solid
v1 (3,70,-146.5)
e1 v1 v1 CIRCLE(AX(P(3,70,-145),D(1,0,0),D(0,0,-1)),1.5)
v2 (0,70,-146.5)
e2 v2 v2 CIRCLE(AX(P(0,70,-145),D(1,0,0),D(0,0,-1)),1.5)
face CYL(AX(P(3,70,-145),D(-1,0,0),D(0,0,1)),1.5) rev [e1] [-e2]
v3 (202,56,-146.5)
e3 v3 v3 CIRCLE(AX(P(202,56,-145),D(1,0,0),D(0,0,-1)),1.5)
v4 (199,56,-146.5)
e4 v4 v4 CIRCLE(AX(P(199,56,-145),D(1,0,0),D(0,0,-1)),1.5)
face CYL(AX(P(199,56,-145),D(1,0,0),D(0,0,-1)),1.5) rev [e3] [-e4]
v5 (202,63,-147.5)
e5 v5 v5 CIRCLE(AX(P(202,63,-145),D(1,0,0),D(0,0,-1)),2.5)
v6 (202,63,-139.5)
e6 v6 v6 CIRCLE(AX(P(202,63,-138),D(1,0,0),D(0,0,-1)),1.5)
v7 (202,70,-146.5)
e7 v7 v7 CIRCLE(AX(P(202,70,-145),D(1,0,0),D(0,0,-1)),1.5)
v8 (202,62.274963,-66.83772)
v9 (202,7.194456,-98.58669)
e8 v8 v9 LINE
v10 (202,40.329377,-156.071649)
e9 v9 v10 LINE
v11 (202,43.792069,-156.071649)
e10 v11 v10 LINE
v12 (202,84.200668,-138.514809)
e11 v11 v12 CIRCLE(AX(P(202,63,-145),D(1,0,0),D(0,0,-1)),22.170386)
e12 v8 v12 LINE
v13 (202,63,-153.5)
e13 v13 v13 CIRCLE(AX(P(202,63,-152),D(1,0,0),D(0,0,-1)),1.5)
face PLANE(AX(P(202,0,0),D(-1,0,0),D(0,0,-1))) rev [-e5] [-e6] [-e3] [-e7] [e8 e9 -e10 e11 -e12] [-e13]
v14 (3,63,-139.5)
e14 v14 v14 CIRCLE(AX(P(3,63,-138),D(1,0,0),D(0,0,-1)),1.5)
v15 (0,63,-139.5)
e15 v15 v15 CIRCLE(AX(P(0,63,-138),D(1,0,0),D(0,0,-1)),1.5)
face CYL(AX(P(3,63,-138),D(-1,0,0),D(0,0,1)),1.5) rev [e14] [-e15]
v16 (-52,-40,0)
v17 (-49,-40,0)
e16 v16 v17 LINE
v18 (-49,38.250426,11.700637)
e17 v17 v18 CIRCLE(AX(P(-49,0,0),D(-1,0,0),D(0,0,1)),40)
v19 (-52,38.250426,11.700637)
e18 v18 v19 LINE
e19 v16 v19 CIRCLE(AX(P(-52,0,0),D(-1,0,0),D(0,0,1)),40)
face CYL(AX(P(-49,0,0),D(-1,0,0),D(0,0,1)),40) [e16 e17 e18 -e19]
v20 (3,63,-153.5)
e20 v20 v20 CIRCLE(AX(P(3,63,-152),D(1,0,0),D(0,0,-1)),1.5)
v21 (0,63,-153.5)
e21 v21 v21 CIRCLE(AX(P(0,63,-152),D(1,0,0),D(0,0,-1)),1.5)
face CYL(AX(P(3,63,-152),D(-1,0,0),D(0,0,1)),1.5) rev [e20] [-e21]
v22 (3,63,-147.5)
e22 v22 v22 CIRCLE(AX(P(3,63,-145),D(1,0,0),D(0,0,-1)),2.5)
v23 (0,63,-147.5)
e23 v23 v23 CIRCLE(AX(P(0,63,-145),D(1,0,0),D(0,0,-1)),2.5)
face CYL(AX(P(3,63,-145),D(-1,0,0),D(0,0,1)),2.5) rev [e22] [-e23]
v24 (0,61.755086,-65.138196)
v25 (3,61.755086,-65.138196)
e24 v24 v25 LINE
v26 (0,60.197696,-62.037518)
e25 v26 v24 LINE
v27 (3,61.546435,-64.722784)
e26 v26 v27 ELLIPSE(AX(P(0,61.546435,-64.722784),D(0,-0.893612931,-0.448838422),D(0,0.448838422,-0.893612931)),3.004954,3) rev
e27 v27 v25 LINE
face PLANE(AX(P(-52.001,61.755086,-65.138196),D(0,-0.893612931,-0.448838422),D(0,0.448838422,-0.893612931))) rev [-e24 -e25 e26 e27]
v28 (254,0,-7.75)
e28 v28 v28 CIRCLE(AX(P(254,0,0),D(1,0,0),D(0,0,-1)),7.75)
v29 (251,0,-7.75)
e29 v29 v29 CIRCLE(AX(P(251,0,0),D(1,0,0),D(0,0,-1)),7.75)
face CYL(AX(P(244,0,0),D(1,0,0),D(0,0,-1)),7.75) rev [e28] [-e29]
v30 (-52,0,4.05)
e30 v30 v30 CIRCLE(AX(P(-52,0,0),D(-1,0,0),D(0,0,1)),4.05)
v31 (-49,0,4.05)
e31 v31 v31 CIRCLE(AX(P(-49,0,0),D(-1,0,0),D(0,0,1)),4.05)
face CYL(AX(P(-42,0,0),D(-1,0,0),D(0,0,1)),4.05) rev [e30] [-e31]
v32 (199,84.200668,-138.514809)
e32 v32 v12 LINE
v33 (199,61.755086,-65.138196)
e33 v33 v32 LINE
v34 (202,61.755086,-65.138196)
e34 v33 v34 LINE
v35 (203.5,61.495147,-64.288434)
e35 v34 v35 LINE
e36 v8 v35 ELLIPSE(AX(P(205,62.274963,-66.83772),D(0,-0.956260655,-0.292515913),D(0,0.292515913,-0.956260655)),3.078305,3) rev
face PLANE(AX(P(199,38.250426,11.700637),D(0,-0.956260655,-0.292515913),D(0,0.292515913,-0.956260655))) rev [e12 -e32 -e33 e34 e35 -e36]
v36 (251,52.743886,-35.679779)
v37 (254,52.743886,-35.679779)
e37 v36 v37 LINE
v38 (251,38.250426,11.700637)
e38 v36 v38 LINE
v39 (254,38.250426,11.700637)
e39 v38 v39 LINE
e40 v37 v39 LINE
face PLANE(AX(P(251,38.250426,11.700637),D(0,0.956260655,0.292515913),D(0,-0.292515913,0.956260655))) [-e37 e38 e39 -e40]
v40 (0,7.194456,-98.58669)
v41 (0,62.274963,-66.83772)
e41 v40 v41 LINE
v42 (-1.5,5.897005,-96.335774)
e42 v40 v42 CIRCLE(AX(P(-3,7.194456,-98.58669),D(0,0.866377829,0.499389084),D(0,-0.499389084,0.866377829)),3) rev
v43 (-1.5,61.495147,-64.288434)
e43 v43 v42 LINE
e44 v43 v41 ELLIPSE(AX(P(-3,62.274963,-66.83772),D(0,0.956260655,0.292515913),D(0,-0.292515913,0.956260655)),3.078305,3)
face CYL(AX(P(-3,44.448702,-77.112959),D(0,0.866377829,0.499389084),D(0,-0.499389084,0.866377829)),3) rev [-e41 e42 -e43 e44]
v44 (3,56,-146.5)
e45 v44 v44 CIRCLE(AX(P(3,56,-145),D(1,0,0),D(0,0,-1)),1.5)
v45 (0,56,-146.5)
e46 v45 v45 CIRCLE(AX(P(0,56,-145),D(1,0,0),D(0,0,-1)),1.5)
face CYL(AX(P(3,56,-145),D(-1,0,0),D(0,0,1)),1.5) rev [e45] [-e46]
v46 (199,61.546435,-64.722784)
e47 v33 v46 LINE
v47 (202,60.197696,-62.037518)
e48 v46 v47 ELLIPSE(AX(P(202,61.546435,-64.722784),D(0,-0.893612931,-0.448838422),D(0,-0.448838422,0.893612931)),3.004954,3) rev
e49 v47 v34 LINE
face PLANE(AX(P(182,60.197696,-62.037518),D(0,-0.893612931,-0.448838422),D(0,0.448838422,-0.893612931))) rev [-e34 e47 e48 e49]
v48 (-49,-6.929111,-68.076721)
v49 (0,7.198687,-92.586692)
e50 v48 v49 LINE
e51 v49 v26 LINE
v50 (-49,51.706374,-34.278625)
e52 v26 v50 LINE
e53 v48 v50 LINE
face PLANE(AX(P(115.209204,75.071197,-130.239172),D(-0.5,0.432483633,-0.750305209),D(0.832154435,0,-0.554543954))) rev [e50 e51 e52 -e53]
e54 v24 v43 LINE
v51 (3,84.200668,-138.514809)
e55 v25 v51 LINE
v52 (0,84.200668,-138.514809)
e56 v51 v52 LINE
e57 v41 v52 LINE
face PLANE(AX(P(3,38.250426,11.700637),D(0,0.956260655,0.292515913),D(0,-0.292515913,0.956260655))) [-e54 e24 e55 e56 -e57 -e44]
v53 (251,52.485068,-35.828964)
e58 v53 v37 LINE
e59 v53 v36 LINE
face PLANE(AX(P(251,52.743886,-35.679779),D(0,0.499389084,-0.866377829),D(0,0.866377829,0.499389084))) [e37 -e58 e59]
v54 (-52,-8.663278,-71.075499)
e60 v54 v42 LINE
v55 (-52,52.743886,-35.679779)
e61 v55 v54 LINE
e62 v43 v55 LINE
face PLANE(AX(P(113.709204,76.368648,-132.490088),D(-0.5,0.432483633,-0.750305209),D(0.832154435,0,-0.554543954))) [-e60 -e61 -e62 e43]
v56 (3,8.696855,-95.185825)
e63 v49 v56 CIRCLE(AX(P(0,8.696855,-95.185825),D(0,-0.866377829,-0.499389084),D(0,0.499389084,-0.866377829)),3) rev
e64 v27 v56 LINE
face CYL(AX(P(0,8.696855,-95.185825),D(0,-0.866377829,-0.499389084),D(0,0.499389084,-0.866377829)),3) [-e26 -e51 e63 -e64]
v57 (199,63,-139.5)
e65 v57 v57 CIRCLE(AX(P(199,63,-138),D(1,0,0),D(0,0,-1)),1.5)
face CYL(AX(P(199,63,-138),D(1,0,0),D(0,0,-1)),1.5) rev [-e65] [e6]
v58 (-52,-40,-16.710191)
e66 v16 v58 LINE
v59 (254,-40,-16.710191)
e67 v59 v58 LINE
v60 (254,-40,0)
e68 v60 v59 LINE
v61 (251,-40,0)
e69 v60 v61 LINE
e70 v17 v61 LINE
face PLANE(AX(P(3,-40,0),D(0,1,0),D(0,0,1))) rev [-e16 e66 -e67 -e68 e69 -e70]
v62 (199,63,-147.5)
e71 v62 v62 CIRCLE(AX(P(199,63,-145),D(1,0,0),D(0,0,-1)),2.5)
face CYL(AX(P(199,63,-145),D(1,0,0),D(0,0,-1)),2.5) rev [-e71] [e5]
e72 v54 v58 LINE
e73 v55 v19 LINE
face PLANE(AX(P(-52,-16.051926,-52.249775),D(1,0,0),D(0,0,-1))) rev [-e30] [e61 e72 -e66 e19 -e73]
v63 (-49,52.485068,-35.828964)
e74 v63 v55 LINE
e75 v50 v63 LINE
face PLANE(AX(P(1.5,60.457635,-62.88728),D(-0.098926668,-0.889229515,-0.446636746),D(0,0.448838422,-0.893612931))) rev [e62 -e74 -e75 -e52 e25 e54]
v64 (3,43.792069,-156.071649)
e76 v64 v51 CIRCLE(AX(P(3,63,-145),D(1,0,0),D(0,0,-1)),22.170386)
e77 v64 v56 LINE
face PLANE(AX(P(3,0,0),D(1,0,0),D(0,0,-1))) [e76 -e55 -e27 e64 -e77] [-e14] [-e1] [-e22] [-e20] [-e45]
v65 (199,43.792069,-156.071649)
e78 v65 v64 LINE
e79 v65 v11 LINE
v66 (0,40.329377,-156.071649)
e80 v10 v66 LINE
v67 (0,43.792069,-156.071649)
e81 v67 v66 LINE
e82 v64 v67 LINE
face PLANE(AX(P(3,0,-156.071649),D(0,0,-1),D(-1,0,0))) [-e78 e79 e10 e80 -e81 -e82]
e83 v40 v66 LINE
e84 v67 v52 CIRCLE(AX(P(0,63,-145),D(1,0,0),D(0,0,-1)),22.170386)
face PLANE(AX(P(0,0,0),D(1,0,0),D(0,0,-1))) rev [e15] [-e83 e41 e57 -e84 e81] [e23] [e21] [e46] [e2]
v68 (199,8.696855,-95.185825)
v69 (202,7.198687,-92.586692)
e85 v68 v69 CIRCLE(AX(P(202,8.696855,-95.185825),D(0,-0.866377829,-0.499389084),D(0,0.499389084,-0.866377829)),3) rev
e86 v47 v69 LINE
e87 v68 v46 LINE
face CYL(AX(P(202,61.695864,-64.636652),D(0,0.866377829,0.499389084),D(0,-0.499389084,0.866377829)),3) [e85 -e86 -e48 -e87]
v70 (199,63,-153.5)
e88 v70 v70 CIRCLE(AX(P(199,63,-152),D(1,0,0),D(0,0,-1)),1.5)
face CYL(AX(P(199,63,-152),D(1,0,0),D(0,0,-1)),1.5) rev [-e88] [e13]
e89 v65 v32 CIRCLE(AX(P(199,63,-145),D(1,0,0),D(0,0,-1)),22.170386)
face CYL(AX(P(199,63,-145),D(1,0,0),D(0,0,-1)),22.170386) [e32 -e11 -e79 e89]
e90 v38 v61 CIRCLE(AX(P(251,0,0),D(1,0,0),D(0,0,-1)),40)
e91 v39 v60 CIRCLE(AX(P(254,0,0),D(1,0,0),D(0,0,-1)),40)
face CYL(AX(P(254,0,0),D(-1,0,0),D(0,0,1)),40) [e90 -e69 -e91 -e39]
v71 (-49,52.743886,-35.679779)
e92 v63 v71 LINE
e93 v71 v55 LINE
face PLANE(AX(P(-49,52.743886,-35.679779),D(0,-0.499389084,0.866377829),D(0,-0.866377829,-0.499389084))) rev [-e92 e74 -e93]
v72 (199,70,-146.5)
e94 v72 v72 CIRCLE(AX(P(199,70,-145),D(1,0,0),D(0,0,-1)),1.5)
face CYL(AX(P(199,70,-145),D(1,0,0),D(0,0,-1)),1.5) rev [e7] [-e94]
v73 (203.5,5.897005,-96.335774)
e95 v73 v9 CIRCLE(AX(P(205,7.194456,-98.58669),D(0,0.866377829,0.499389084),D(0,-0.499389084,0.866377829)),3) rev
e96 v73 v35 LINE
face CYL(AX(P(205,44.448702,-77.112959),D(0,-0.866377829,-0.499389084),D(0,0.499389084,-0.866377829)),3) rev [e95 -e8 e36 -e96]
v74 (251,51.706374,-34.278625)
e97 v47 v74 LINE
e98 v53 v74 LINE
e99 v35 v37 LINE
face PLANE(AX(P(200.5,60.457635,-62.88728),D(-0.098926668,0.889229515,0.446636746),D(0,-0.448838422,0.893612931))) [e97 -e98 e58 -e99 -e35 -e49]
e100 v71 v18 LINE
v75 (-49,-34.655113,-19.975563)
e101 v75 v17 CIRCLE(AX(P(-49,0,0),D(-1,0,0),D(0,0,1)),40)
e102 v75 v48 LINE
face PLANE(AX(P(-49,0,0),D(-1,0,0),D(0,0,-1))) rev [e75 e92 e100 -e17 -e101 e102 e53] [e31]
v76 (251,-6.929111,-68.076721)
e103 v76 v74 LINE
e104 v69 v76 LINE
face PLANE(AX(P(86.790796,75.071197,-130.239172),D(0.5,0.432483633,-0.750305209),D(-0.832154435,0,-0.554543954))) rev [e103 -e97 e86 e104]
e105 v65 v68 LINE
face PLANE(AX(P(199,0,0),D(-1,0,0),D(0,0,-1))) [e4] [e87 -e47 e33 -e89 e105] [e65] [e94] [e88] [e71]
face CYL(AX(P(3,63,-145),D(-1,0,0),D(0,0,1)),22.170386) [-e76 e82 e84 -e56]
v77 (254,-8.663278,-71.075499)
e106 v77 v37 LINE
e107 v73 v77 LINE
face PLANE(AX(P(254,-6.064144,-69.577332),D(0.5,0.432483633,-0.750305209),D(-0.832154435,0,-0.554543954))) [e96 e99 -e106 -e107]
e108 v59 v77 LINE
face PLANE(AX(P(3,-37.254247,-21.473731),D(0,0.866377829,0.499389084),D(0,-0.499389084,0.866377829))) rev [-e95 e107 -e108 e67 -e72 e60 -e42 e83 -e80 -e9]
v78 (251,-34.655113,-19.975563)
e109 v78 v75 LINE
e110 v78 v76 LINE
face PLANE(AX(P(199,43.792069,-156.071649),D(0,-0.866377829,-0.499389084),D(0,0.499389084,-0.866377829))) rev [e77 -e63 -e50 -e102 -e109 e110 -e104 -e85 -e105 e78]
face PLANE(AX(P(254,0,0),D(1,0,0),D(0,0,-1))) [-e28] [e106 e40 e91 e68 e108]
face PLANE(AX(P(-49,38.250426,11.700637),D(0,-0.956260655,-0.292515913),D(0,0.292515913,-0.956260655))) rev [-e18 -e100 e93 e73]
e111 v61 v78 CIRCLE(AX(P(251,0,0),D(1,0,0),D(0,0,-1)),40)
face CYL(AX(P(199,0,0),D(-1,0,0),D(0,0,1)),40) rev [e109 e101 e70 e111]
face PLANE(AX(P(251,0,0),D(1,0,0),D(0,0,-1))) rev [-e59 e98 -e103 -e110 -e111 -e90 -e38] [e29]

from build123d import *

# Parameters (mm, degrees)
SKETCH_2_R          = 3
SKETCH_2_R_2        = 1.5
SKETCH_2_R_3        = 2.5
EXTRUDE_1_DEPTH     = 3
EXTRUDE_2_DEPTH     = 196
SKETCH_5_R          = 8
CUT_EXTRUDE_1_DEPTH = 10
SKETCH_6_R          = 4.05
CUT_EXTRUDE_2_DEPTH = 10
SKETCH_8_R          = 40
EXTRUDE_3_DEPTH     = 3
EXTRUDE_START       = -61
EXTRUDE_4_DEPTH     = 64
EXTRUDE_5_DEPTH     = 3
EXTRUDE_START_2     = -3
EXTRUDE_14_DEPTH    = 3
EXTRUDE_15_DEPTH    = 3
SKETCH_16_R         = 40
EXTRUDE_16_DEPTH    = 3
CUT_EXTRUDE_START   = -20
CUT_EXTRUDE_5_DEPTH = 20
CUT_EXTRUDE_6_DEPTH = 20
CUT_EXTRUDE_7_DEPTH = 3
FILLET_3_R          = 3
FILLET_4_R          = 3
FILLET_5_R          = 3
FILLET_6_R          = 3
SKETCH_22_R         = 7.75
CUT_EXTRUDE_8_DEPTH = 10
SKETCH_23_R         = 4.05
CUT_EXTRUDE_9_DEPTH = 10


# Some blends are built 0.0001 mm under size
with BuildPart() as part:
    # 草图2 → 凸台-拉伸1 (new body)
    with BuildSketch(Plane(origin=(0, 0, 0), x_dir=(0, 0, -1), z_dir=(1, 0, 0))):
        with BuildLine():
            Line((138.514809283, 84.200667909), (-11.70063651, 38.25042621))
            ThreePointArc((-11.70063651, 38.25042621), (-39.560188627, -5.915359313), (0, -40))
            Line((0, -40), (16.710190716, -40))
            Line((16.710190716, -40), (156.071648789, 40.329376559))
            Line((156.071648789, 40.329376559), (156.071648789, 43.792069046))
            ThreePointArc((156.071648789, 43.792069046), (165.334026038, 71.834783727), (138.514809283, 84.200667909))
        make_face()
        Circle(SKETCH_2_R, mode=Mode.SUBTRACT)
        with Locations((145, 70)):
            Circle(SKETCH_2_R_2, mode=Mode.SUBTRACT)
        with Locations((138, 63)):
            Circle(SKETCH_2_R_2, mode=Mode.SUBTRACT)
        with Locations((145, 56)):
            Circle(SKETCH_2_R_2, mode=Mode.SUBTRACT)
        with Locations((145, 63)):
            Circle(SKETCH_2_R_3, mode=Mode.SUBTRACT)
        with Locations((152, 63)):
            Circle(SKETCH_2_R_2, mode=Mode.SUBTRACT)
    extrude_1 = extrude(amount=EXTRUDE_1_DEPTH)

    # 草图4 → 凸台-拉伸2 (add)
    with BuildSketch(Plane(origin=(3, 0, 0), x_dir=(0, 0, -1), z_dir=(1, 0, 0))):
        with BuildLine():
            Line((0, -40), (16.710190716, -40))
            Line((16.710190716, -40), (156.071648789, 40.329376559))
            Line((156.071648789, 40.329376559), (156.071648789, 43.792069046))
            Line((156.071648789, 43.792069046), (19.975563357, -34.655113166))
            ThreePointArc((19.975563357, -34.655113166), (10.339136167, -38.640681455), (0, -40))
        make_face()
    extrude(amount=EXTRUDE_2_DEPTH)

    # 镜向2: 凸台-拉伸1 across plane
    add(extrude_1.mirror(Plane(origin=(101, 0, 0), x_dir=(0, 0, 1), z_dir=(1, 0, 0))))

    # 草图5 → 切除-拉伸1 (cut)
    with BuildSketch(Plane(origin=(202, 0, 0), x_dir=(0, 0, -1), z_dir=(1, 0, 0))):
        Circle(SKETCH_5_R)
    extrude(amount=-CUT_EXTRUDE_1_DEPTH, mode=Mode.SUBTRACT)

    # 草图6 → 切除-拉伸2 (cut)
    with BuildSketch(Plane.ZY):
        Circle(SKETCH_6_R)
    extrude(amount=-CUT_EXTRUDE_2_DEPTH, mode=Mode.SUBTRACT)

    # 草图9 → 凸台-拉伸4 (add)
    with BuildSketch(Plane(origin=(251, 0, 0), x_dir=(0, 0, -1), z_dir=(1, 0, 0)).offset(EXTRUDE_START)):
        with BuildLine():
            Line((0, -40), (16.710190716, -40))
            Line((16.710190716, -40), (53.747942483, -18.651059269))
            Line((53.747942483, -18.651059269), (52.249775231, -16.051925781))
            Line((52.249775231, -16.051925781), (19.975563357, -34.655113166))
            ThreePointArc((19.975563357, -34.655113166), (10.339136167, -38.640681455), (0, -40))
        make_face()
    extrude_4 = extrude(amount=EXTRUDE_4_DEPTH)

    # 草图10 → 凸台-拉伸5 (add)
    with BuildSketch(Plane(origin=(0, -37.254246654, -21.473730609), x_dir=(1, 0, 0), z_dir=(0, -0.8663778291595938, -0.49938908392225567))):
        Polygon((254, -37.251890328), (254, -57.251890328), (202, -87.274104325), (202, -37.251890328), align=None)
    extrude_5 = extrude(amount=-EXTRUDE_5_DEPTH)



with BuildPart() as body_2:
    # 草图8 → 凸台-拉伸3 (new body)
    with BuildSketch(Plane(origin=(251, 0, 0), x_dir=(0, 0, -1), z_dir=(1, 0, 0))):
        Circle(SKETCH_8_R)
    extrude(amount=EXTRUDE_3_DEPTH)


with BuildPart() as part_1:
    add(part.part)

    add(body_2.part)  # 凸台-拉伸14 merges body 2
    # 草图14 → 凸台-拉伸14 (add)
    with BuildSketch(Plane(origin=(254, 0, 0), x_dir=(0, 0, -1), z_dir=(1, 0, 0)).offset(EXTRUDE_START_2)):
        with BuildLine():
            Line((-11.70063651, 38.25042621), (35.679778873, 52.743886101))
            Line((35.679778873, 52.743886101), (69.577331814, -6.064144103))
            Line((69.577331814, -6.064144103), (19.975563357, -34.655113166))
            ThreePointArc((19.975563357, -34.655113166), (36.686823541, 15.939792297), (-11.70063651, 38.25042621))
        make_face()
    extrude_14 = extrude(amount=EXTRUDE_14_DEPTH)

    # 草图15 → 凸台-拉伸15 (add)
    with BuildSketch(Plane(origin=(88.290795719, 76.368648195, -132.490087928), x_dir=(-0.8660254037844362, 0.24969454196113003, -0.4331889145798008), z_dir=(0.5000000000000044, 0.4324836330493111, -0.7503052093278204))):
        Polygon((-191.344507397, -43), (-191.344507397, 27.878041456), (-131.300079402, 20.97393325), (-131.300079402, -43), align=None)
    extrude_15 = extrude(amount=-EXTRUDE_15_DEPTH)

    # 镜向8: 凸台-拉伸15 across plane
    add(extrude_15.mirror(Plane(origin=(101, 0, 0), x_dir=(0, 0, 1), z_dir=(1, 0, 0))))

    # 镜向10: 凸台-拉伸5 across plane
    add(extrude_5.mirror(Plane(origin=(101, 0, 0), x_dir=(0, 0, 1), z_dir=(1, 0, 0))))

    # 镜向11: 凸台-拉伸4 across plane
    add(extrude_4.mirror(Plane(origin=(101, 0, 0), x_dir=(0, 0, 1), z_dir=(1, 0, 0))))

    # 镜向12: 凸台-拉伸14 across plane
    add(extrude_14.mirror(Plane(origin=(101, 0, 0), x_dir=(0, 0, 1), z_dir=(1, 0, 0))))

    # 草图16 → 凸台-拉伸16 (add)
    with BuildSketch(Plane.ZY.offset(52)):
        Circle(SKETCH_16_R)
    extrude(amount=-EXTRUDE_16_DEPTH)

    # 草图17 → 切除-拉伸5 (cut)
    with BuildSketch(Plane(origin=(202, 0, 0), x_dir=(0, 0, -1), z_dir=(1, 0, 0)).offset(CUT_EXTRUDE_START)):
        with BuildLine():
            Line((-11.120326036, 38.423148607), (61.739147636, 60.715331959))
            Line((61.739147636, 60.715331959), (65.138195736, 61.755085767))
            Line((65.138195736, 61.755085767), (62.037518083, 60.197696416))
            Line((62.037518083, 60.197696416), (92.586691567, 7.198687311))
            Line((92.586691567, 7.198687311), (19.975563357, -34.655113166))
            ThreePointArc((19.975563357, -34.655113166), (-36.806411031, -15.66167638), (-11.120326036, 38.423148607))
        make_face()
    extrude(amount=CUT_EXTRUDE_5_DEPTH, mode=Mode.SUBTRACT)


with BuildPart() as cut_extrude_5_piece_1:
    # of the separate pieces the step leaves, piece 1, a body of its own (cut_extrude_5_pieces)
    add(part_1.part.solids().sort_by_distance((0, 43.792069046, -156.071648789))[0])

    # 草图21 → 切除-拉伸7 (cut)
    with BuildSketch(Plane(origin=(3, 0, 0), x_dir=(0, 0, -1), z_dir=(1, 0, 0))):
        with BuildLine():
            Line((92.586691567, 7.198687311), (62.037518083, 60.197696416))
            Line((62.037518083, 60.197696416), (65.138195736, 61.755085767))
            Line((65.138195736, 61.755085767), (61.739147636, 60.715331959))
            Line((61.739147636, 60.715331959), (-11.70063651, 38.25042621))
            ThreePointArc((-11.70063651, 38.25042621), (-36.686823541, -15.939792297), (19.975563357, -34.655113166))
            Line((19.975563357, -34.655113166), (92.586691567, 7.198687311))
        make_face()
    extrude(amount=-CUT_EXTRUDE_7_DEPTH, mode=Mode.SUBTRACT)

    # 圆角3
    fillet_3_edges = [cut_extrude_5_piece_1.edges().sort_by_distance(p)[0] for p in [
        (3, 33.698191863, -77.312104825),
    ]]
    fillet(fillet_3_edges, radius=FILLET_3_R - 0.0001)  # a hair under: the kernel refuses the full size

    # 圆角4
    fillet_4_edges = [cut_extrude_5_piece_1.edges().sort_by_distance(p)[0] for p in [
        (199, 33.698191863, -77.312104825),
    ]]
    fillet(fillet_4_edges, radius=FILLET_4_R - 0.0001)  # a hair under: the kernel refuses the full size

    # 圆角5
    # the kernel refuses this fillet: 3 mm, written as the material it adds along each edge
    with BuildSketch(Plane(origin=(202, 65.506611814, -62.97577757), x_dir=(0, 0.49938908392225534, -0.8663778291595939), z_dir=(0, -0.866377829159594, -0.4993890839222554))) as fillet_5_piece_1_section:
        with BuildLine():
            CenterArc((FILLET_5_R * 0.57735026919, FILLET_5_R), FILLET_5_R, 210, 60)
            Line((-FILLET_5_R * 0.288675134595, FILLET_5_R * 0.5), (0, 0))
            Line((0, 0), (FILLET_5_R * 0.57735026919, 0))
        make_face()
    fillet_5_piece_1 = extrude(amount=68.304060269, mode=Mode.PRIVATE)
    fillet_5_piece_1 = split(fillet_5_piece_1, bisect_by=Plane(origin=(202.325553984, 63.906694987, -72.171998522), z_dir=(0, -0.9562606552534866, -0.2925159127537726)), keep=Keep.TOP, mode=Mode.PRIVATE)
    fillet_5_piece_1 = split(fillet_5_piece_1, bisect_by=Plane(origin=(199.177617764, 62.412552566, -67.072312804), z_dir=(0.09892666816624712, -0.8892295154916122, -0.44663674625368427)), keep=Keep.TOP, mode=Mode.PRIVATE)
    add(fillet_5_piece_1)

    # 圆角6
    # the kernel refuses this fillet: 3 mm, written as the material it adds along each edge
    with BuildSketch(Plane(origin=(0, 6.329488355, -97.086079656), x_dir=(2.017234182721707e-14, 0.49938908392225534, -0.8663778291595939), z_dir=(0, 0.8663778291595939, 0.4993890839222554))) as fillet_6_piece_1_section:
        with BuildLine():
            CenterArc((FILLET_6_R * 0.57735026919, FILLET_6_R), FILLET_6_R, 210, 60)
            Line((-FILLET_6_R * 0.288675134595, FILLET_6_R * 0.5), (0, 0))
            Line((0, 0), (FILLET_6_R * 0.57735026919, 0))
        make_face()
    fillet_6_piece_1 = extrude(amount=68.304060269, mode=Mode.PRIVATE)
    fillet_6_piece_1 = split(fillet_6_piece_1, bisect_by=Plane(origin=(-0.325553984, 63.906694987, -72.171998522), z_dir=(0, -0.9562606552534866, -0.2925159127537726)), keep=Keep.TOP, mode=Mode.PRIVATE)
    fillet_6_piece_1 = split(fillet_6_piece_1, bisect_by=Plane(origin=(2.822382236, 62.412552566, -67.072312804), z_dir=(-0.09892666816624712, -0.8892295154916122, -0.44663674625368427)), keep=Keep.TOP, mode=Mode.PRIVATE)
    add(fillet_6_piece_1)

    # 草图22 → 切除-拉伸8 (cut)
    with BuildSketch(Plane(origin=(254, 0, 0), x_dir=(0, 0, -1), z_dir=(1, 0, 0))):
        Circle(SKETCH_22_R)
    extrude(amount=-CUT_EXTRUDE_8_DEPTH, mode=Mode.SUBTRACT)

    # 草图23 → 切除-拉伸9 (cut)
    with BuildSketch(Plane.ZY.offset(52)):
        Circle(SKETCH_23_R)
    extrude(amount=-CUT_EXTRUDE_9_DEPTH, mode=Mode.SUBTRACT)


with BuildPart() as cut_extrude_5_piece_2:
    # of the separate pieces the step leaves, piece 2, a body of its own (cut_extrude_5_pieces)
    add(part_1.part.solids().sort_by_distance((202, 60.715331959, -61.739147636))[0])

    # 草图18 → 切除-拉伸6 (cut)
    with BuildSketch(Plane(origin=(0, 38.25042621, 11.70063651), x_dir=(1, 0, 0), z_dir=(0, 0.9562606552534866, 0.2925159127537726))):
        Polygon((199, 76.798918519), (202, 76.932821805), (202, 0), (199, 0), align=None)
    extrude(amount=-CUT_EXTRUDE_6_DEPTH, mode=Mode.SUBTRACT)


solid = cut_extrude_5_piece_1.part
